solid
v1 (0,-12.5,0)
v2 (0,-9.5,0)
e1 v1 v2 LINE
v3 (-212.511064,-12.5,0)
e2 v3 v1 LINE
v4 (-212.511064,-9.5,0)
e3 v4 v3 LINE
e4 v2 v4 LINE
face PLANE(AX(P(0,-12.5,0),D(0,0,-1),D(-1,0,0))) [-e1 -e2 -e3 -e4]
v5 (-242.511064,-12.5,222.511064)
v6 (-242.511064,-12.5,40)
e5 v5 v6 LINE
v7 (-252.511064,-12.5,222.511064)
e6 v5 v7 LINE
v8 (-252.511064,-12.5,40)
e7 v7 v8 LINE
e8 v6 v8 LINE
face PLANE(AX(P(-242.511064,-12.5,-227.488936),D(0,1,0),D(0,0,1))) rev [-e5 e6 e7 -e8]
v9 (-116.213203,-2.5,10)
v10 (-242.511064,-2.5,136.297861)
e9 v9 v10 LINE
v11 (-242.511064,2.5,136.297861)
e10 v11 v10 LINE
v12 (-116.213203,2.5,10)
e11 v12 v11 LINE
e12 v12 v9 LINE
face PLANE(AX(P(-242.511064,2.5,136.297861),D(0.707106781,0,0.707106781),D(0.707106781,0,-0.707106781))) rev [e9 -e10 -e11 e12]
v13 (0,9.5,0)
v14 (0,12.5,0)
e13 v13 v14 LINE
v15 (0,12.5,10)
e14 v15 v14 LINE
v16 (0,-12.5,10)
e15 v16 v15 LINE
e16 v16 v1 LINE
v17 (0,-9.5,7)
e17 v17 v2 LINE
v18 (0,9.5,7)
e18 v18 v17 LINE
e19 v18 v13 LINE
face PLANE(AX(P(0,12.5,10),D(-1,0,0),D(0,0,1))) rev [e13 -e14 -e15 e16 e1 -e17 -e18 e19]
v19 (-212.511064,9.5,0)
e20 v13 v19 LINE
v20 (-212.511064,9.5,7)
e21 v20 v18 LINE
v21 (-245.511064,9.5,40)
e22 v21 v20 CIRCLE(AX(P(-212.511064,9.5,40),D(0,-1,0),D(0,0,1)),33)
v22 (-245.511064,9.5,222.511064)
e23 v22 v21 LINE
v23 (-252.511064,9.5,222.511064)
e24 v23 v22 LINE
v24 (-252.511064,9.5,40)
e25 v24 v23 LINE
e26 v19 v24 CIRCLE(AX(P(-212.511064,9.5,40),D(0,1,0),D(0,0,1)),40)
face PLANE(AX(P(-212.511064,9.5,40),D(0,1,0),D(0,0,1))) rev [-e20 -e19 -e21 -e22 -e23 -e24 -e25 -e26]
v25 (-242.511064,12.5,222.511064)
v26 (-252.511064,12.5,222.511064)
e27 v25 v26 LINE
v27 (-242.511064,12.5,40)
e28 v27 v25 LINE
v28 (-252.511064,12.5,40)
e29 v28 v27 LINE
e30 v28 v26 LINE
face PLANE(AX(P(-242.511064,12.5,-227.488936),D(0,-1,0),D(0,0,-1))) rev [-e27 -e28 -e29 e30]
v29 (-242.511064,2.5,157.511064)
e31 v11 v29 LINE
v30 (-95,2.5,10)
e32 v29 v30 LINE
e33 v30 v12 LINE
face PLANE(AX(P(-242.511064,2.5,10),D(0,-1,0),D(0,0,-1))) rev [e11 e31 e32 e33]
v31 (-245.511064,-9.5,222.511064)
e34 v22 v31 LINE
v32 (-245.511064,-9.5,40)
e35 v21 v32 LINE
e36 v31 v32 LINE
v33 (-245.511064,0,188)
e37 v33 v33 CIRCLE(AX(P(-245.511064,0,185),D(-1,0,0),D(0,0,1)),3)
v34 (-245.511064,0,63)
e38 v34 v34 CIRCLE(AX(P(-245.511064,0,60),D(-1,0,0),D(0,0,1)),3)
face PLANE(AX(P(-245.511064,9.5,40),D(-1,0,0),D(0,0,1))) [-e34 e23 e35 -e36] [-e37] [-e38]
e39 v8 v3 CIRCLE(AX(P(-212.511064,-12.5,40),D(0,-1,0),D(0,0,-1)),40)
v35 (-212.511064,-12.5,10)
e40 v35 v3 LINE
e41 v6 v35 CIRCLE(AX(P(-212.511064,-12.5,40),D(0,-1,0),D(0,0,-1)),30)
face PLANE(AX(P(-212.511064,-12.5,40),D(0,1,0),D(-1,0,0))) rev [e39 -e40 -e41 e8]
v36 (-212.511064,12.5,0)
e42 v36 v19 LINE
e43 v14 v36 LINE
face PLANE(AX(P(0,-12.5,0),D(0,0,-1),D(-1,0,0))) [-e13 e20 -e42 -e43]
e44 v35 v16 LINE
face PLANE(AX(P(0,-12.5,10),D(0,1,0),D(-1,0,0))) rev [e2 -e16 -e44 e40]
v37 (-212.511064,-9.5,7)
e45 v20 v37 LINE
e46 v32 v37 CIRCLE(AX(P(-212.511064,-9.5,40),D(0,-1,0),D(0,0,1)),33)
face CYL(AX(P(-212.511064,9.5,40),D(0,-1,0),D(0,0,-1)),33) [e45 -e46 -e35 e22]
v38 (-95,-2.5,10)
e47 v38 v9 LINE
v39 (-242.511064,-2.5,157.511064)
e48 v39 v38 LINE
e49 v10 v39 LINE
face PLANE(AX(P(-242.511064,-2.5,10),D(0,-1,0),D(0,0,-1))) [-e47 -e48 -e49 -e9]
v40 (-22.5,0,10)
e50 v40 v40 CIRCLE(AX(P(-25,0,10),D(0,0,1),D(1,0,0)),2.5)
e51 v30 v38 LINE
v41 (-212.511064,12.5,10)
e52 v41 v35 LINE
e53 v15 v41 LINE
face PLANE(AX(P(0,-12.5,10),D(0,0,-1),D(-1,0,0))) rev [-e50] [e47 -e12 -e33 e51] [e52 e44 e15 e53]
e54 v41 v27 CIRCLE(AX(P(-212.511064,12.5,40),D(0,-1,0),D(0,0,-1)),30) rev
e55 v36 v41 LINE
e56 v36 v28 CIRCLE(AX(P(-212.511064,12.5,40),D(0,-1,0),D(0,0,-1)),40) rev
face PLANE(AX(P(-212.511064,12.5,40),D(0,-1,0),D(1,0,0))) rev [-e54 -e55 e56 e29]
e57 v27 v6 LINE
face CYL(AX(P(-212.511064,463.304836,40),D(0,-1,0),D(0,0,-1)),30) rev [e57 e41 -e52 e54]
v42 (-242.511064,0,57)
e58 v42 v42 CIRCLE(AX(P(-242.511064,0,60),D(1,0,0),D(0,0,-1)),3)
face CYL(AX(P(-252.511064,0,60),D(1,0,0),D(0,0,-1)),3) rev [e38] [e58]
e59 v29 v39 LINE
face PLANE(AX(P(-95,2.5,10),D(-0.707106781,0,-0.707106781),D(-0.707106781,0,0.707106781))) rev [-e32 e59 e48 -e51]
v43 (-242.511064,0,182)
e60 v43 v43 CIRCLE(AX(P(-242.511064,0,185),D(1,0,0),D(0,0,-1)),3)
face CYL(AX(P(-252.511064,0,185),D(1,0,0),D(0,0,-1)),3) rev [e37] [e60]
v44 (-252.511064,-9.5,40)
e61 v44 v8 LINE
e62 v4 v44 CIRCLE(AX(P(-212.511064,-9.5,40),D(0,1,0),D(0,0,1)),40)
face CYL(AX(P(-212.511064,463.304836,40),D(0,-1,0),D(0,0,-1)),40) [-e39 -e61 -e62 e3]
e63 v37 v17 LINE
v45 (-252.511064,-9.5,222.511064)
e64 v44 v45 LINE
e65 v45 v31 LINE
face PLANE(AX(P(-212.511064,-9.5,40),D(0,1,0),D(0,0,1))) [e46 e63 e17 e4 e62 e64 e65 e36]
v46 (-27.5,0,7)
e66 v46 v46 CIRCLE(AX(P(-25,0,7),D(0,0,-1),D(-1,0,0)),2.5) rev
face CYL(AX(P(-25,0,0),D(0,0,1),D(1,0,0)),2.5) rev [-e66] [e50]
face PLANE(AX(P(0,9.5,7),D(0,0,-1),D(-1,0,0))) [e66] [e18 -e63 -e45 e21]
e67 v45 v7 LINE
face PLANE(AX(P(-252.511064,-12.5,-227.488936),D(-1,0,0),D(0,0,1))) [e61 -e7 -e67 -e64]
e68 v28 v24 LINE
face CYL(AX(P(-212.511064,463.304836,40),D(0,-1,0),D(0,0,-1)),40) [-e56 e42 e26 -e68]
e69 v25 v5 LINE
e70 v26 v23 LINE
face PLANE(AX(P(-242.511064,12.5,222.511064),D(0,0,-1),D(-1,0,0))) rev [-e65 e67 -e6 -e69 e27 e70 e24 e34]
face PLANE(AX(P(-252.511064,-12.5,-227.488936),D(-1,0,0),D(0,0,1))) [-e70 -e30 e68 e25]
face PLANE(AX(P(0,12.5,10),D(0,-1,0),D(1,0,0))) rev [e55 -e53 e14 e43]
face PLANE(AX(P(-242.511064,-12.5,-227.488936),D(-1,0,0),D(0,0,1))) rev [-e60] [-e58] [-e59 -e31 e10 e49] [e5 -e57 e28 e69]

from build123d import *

# Parameters (mm, degrees)
ESQUISSE1_W                  = 450
ESQUISSE1_H                  = 25
EXTRUSION1_DEPTH             = 10
PLIAGE_START                 = -12.5
PLIAGE_1_DEPTH               = 25
PLIAGE_1_2_DEPTH             = 25
ESQUISSE5_R                  = 3
ENL_V_MAT_EXTRU_1_DEPTH      = 330.361564282
ESQUISSE7_R                  = 2.5
ENL_V_MAT_EXTRU_2_DEPTH      = 331.27116136
ENL_V_MAT_EXTRU_3_DEPTH      = 9.5
ENL_V_MAT_EXTRU_3_DEPTH_BACK = 9.5
EXTRUSION2_DEPTH             = 2.5


# Read off the part's stored shape, not the designer's step: Pliage 1
with BuildPart() as part:
    # Esquisse1 → Extrusion1 (new body)
    with BuildSketch(Plane.XY):
        with Locations((-225, 0)):
            Rectangle(ESQUISSE1_W, ESQUISSE1_H)
    extrude(amount=EXTRUSION1_DEPTH)

    # Pliage 1 outline → Pliage 1 (cut)
    with BuildSketch(Plane(origin=(0, 0, 0), x_dir=(1, 0, 0), z_dir=(0, 1, 0)).offset(PLIAGE_START)):
        with BuildLine():
            Line((-450, -10), (-238.968577392, -10))
            ThreePointArc((-238.968577392, -10), (-226.653199905, -2.583426132), (-212.511064281, 0))
            Line((-212.511064281, 0), (-450, 0))
            Line((-450, 0), (-450, -10))
        make_face()
    extrude(amount=PLIAGE_1_DEPTH, mode=Mode.SUBTRACT)

    # Pliage 1 2 outline → Pliage 1 2 (add)
    with BuildSketch(Plane(origin=(0, 0, 0), x_dir=(1, 0, 0), z_dir=(0, 1, 0)).offset(PLIAGE_START)):
        with BuildLine():
            ThreePointArc((-238.968577392, -10), (-248.968577392, -23.542486889), (-252.511064281, -40))
            Line((-252.511064281, -40), (-252.511064281, -222.511064281))
            Line((-252.511064281, -222.511064281), (-242.511064281, -222.511064281))
            Line((-242.511064281, -222.511064281), (-242.511064281, -40))
            ThreePointArc((-242.511064281, -40), (-233.724267717, -18.786796564), (-212.511064281, -10))
            Line((-212.511064281, -10), (-238.968577392, -10))
        make_face()
    extrude(amount=PLIAGE_1_2_DEPTH)

    # Esquisse5 → Enlèv. mat.-Extru.1 (cut, through all)
    with BuildSketch(Plane(origin=(-242.511064281, 0, 0), x_dir=(0, 0, -1), z_dir=(1, 0, 0))):
        with Locations((-185, 0)):
            Circle(ESQUISSE5_R)
        with Locations((-60, 0)):
            Circle(ESQUISSE5_R)
    extrude(amount=-ENL_V_MAT_EXTRU_1_DEPTH, mode=Mode.SUBTRACT)

    # Esquisse7 → Enlèv. mat.-Extru.2 (cut, through all)
    with BuildSketch(Plane.XY.offset(10)):
        with Locations((-25, 0)):
            Circle(ESQUISSE7_R)
    extrude(amount=-ENL_V_MAT_EXTRU_2_DEPTH, mode=Mode.SUBTRACT)

    # Esquisse8 → Enlèv. mat.-Extru.3 (cut, two sides: drawn at the far end of the back side and taken through both)
    with BuildSketch(Plane(origin=(0, 0, 0), x_dir=(1, 0, 0), z_dir=(0, 1, 0)).offset(-ENL_V_MAT_EXTRU_3_DEPTH_BACK)):
        with BuildLine():
            Line((0, -7), (-212.511064281, -7))
            ThreePointArc((-212.511064281, -7), (-235.84558806, -16.665476221), (-245.511064281, -40))
            Line((-245.511064281, -40), (-245.511064281, -222.511064281))
            Line((-245.511064281, -222.511064281), (-252.511064281, -222.511064281))
            Line((-252.511064281, -222.511064281), (-252.511064281, -40))
            ThreePointArc((-252.511064281, -40), (-240.795335529, -11.715728753), (-212.511064281, 0))
            Line((-212.511064281, 0), (0, 0))
            Line((0, 0), (0, -7))
        make_face()
    extrude(amount=ENL_V_MAT_EXTRU_3_DEPTH + ENL_V_MAT_EXTRU_3_DEPTH_BACK, mode=Mode.SUBTRACT)

    # Esquisse6 → Extrusion2 (add, symmetric)
    with BuildSketch(Plane(origin=(0, 0, 0), x_dir=(1, 0, 0), z_dir=(0, 1, 0))):
        Polygon((-242.511064281, -136.297860845), (-116.213203436, -10), (-95, -10), (-242.511064281, -157.511064281), align=None)
    extrude(amount=EXTRUSION2_DEPTH, both=True)


solid = part.part
